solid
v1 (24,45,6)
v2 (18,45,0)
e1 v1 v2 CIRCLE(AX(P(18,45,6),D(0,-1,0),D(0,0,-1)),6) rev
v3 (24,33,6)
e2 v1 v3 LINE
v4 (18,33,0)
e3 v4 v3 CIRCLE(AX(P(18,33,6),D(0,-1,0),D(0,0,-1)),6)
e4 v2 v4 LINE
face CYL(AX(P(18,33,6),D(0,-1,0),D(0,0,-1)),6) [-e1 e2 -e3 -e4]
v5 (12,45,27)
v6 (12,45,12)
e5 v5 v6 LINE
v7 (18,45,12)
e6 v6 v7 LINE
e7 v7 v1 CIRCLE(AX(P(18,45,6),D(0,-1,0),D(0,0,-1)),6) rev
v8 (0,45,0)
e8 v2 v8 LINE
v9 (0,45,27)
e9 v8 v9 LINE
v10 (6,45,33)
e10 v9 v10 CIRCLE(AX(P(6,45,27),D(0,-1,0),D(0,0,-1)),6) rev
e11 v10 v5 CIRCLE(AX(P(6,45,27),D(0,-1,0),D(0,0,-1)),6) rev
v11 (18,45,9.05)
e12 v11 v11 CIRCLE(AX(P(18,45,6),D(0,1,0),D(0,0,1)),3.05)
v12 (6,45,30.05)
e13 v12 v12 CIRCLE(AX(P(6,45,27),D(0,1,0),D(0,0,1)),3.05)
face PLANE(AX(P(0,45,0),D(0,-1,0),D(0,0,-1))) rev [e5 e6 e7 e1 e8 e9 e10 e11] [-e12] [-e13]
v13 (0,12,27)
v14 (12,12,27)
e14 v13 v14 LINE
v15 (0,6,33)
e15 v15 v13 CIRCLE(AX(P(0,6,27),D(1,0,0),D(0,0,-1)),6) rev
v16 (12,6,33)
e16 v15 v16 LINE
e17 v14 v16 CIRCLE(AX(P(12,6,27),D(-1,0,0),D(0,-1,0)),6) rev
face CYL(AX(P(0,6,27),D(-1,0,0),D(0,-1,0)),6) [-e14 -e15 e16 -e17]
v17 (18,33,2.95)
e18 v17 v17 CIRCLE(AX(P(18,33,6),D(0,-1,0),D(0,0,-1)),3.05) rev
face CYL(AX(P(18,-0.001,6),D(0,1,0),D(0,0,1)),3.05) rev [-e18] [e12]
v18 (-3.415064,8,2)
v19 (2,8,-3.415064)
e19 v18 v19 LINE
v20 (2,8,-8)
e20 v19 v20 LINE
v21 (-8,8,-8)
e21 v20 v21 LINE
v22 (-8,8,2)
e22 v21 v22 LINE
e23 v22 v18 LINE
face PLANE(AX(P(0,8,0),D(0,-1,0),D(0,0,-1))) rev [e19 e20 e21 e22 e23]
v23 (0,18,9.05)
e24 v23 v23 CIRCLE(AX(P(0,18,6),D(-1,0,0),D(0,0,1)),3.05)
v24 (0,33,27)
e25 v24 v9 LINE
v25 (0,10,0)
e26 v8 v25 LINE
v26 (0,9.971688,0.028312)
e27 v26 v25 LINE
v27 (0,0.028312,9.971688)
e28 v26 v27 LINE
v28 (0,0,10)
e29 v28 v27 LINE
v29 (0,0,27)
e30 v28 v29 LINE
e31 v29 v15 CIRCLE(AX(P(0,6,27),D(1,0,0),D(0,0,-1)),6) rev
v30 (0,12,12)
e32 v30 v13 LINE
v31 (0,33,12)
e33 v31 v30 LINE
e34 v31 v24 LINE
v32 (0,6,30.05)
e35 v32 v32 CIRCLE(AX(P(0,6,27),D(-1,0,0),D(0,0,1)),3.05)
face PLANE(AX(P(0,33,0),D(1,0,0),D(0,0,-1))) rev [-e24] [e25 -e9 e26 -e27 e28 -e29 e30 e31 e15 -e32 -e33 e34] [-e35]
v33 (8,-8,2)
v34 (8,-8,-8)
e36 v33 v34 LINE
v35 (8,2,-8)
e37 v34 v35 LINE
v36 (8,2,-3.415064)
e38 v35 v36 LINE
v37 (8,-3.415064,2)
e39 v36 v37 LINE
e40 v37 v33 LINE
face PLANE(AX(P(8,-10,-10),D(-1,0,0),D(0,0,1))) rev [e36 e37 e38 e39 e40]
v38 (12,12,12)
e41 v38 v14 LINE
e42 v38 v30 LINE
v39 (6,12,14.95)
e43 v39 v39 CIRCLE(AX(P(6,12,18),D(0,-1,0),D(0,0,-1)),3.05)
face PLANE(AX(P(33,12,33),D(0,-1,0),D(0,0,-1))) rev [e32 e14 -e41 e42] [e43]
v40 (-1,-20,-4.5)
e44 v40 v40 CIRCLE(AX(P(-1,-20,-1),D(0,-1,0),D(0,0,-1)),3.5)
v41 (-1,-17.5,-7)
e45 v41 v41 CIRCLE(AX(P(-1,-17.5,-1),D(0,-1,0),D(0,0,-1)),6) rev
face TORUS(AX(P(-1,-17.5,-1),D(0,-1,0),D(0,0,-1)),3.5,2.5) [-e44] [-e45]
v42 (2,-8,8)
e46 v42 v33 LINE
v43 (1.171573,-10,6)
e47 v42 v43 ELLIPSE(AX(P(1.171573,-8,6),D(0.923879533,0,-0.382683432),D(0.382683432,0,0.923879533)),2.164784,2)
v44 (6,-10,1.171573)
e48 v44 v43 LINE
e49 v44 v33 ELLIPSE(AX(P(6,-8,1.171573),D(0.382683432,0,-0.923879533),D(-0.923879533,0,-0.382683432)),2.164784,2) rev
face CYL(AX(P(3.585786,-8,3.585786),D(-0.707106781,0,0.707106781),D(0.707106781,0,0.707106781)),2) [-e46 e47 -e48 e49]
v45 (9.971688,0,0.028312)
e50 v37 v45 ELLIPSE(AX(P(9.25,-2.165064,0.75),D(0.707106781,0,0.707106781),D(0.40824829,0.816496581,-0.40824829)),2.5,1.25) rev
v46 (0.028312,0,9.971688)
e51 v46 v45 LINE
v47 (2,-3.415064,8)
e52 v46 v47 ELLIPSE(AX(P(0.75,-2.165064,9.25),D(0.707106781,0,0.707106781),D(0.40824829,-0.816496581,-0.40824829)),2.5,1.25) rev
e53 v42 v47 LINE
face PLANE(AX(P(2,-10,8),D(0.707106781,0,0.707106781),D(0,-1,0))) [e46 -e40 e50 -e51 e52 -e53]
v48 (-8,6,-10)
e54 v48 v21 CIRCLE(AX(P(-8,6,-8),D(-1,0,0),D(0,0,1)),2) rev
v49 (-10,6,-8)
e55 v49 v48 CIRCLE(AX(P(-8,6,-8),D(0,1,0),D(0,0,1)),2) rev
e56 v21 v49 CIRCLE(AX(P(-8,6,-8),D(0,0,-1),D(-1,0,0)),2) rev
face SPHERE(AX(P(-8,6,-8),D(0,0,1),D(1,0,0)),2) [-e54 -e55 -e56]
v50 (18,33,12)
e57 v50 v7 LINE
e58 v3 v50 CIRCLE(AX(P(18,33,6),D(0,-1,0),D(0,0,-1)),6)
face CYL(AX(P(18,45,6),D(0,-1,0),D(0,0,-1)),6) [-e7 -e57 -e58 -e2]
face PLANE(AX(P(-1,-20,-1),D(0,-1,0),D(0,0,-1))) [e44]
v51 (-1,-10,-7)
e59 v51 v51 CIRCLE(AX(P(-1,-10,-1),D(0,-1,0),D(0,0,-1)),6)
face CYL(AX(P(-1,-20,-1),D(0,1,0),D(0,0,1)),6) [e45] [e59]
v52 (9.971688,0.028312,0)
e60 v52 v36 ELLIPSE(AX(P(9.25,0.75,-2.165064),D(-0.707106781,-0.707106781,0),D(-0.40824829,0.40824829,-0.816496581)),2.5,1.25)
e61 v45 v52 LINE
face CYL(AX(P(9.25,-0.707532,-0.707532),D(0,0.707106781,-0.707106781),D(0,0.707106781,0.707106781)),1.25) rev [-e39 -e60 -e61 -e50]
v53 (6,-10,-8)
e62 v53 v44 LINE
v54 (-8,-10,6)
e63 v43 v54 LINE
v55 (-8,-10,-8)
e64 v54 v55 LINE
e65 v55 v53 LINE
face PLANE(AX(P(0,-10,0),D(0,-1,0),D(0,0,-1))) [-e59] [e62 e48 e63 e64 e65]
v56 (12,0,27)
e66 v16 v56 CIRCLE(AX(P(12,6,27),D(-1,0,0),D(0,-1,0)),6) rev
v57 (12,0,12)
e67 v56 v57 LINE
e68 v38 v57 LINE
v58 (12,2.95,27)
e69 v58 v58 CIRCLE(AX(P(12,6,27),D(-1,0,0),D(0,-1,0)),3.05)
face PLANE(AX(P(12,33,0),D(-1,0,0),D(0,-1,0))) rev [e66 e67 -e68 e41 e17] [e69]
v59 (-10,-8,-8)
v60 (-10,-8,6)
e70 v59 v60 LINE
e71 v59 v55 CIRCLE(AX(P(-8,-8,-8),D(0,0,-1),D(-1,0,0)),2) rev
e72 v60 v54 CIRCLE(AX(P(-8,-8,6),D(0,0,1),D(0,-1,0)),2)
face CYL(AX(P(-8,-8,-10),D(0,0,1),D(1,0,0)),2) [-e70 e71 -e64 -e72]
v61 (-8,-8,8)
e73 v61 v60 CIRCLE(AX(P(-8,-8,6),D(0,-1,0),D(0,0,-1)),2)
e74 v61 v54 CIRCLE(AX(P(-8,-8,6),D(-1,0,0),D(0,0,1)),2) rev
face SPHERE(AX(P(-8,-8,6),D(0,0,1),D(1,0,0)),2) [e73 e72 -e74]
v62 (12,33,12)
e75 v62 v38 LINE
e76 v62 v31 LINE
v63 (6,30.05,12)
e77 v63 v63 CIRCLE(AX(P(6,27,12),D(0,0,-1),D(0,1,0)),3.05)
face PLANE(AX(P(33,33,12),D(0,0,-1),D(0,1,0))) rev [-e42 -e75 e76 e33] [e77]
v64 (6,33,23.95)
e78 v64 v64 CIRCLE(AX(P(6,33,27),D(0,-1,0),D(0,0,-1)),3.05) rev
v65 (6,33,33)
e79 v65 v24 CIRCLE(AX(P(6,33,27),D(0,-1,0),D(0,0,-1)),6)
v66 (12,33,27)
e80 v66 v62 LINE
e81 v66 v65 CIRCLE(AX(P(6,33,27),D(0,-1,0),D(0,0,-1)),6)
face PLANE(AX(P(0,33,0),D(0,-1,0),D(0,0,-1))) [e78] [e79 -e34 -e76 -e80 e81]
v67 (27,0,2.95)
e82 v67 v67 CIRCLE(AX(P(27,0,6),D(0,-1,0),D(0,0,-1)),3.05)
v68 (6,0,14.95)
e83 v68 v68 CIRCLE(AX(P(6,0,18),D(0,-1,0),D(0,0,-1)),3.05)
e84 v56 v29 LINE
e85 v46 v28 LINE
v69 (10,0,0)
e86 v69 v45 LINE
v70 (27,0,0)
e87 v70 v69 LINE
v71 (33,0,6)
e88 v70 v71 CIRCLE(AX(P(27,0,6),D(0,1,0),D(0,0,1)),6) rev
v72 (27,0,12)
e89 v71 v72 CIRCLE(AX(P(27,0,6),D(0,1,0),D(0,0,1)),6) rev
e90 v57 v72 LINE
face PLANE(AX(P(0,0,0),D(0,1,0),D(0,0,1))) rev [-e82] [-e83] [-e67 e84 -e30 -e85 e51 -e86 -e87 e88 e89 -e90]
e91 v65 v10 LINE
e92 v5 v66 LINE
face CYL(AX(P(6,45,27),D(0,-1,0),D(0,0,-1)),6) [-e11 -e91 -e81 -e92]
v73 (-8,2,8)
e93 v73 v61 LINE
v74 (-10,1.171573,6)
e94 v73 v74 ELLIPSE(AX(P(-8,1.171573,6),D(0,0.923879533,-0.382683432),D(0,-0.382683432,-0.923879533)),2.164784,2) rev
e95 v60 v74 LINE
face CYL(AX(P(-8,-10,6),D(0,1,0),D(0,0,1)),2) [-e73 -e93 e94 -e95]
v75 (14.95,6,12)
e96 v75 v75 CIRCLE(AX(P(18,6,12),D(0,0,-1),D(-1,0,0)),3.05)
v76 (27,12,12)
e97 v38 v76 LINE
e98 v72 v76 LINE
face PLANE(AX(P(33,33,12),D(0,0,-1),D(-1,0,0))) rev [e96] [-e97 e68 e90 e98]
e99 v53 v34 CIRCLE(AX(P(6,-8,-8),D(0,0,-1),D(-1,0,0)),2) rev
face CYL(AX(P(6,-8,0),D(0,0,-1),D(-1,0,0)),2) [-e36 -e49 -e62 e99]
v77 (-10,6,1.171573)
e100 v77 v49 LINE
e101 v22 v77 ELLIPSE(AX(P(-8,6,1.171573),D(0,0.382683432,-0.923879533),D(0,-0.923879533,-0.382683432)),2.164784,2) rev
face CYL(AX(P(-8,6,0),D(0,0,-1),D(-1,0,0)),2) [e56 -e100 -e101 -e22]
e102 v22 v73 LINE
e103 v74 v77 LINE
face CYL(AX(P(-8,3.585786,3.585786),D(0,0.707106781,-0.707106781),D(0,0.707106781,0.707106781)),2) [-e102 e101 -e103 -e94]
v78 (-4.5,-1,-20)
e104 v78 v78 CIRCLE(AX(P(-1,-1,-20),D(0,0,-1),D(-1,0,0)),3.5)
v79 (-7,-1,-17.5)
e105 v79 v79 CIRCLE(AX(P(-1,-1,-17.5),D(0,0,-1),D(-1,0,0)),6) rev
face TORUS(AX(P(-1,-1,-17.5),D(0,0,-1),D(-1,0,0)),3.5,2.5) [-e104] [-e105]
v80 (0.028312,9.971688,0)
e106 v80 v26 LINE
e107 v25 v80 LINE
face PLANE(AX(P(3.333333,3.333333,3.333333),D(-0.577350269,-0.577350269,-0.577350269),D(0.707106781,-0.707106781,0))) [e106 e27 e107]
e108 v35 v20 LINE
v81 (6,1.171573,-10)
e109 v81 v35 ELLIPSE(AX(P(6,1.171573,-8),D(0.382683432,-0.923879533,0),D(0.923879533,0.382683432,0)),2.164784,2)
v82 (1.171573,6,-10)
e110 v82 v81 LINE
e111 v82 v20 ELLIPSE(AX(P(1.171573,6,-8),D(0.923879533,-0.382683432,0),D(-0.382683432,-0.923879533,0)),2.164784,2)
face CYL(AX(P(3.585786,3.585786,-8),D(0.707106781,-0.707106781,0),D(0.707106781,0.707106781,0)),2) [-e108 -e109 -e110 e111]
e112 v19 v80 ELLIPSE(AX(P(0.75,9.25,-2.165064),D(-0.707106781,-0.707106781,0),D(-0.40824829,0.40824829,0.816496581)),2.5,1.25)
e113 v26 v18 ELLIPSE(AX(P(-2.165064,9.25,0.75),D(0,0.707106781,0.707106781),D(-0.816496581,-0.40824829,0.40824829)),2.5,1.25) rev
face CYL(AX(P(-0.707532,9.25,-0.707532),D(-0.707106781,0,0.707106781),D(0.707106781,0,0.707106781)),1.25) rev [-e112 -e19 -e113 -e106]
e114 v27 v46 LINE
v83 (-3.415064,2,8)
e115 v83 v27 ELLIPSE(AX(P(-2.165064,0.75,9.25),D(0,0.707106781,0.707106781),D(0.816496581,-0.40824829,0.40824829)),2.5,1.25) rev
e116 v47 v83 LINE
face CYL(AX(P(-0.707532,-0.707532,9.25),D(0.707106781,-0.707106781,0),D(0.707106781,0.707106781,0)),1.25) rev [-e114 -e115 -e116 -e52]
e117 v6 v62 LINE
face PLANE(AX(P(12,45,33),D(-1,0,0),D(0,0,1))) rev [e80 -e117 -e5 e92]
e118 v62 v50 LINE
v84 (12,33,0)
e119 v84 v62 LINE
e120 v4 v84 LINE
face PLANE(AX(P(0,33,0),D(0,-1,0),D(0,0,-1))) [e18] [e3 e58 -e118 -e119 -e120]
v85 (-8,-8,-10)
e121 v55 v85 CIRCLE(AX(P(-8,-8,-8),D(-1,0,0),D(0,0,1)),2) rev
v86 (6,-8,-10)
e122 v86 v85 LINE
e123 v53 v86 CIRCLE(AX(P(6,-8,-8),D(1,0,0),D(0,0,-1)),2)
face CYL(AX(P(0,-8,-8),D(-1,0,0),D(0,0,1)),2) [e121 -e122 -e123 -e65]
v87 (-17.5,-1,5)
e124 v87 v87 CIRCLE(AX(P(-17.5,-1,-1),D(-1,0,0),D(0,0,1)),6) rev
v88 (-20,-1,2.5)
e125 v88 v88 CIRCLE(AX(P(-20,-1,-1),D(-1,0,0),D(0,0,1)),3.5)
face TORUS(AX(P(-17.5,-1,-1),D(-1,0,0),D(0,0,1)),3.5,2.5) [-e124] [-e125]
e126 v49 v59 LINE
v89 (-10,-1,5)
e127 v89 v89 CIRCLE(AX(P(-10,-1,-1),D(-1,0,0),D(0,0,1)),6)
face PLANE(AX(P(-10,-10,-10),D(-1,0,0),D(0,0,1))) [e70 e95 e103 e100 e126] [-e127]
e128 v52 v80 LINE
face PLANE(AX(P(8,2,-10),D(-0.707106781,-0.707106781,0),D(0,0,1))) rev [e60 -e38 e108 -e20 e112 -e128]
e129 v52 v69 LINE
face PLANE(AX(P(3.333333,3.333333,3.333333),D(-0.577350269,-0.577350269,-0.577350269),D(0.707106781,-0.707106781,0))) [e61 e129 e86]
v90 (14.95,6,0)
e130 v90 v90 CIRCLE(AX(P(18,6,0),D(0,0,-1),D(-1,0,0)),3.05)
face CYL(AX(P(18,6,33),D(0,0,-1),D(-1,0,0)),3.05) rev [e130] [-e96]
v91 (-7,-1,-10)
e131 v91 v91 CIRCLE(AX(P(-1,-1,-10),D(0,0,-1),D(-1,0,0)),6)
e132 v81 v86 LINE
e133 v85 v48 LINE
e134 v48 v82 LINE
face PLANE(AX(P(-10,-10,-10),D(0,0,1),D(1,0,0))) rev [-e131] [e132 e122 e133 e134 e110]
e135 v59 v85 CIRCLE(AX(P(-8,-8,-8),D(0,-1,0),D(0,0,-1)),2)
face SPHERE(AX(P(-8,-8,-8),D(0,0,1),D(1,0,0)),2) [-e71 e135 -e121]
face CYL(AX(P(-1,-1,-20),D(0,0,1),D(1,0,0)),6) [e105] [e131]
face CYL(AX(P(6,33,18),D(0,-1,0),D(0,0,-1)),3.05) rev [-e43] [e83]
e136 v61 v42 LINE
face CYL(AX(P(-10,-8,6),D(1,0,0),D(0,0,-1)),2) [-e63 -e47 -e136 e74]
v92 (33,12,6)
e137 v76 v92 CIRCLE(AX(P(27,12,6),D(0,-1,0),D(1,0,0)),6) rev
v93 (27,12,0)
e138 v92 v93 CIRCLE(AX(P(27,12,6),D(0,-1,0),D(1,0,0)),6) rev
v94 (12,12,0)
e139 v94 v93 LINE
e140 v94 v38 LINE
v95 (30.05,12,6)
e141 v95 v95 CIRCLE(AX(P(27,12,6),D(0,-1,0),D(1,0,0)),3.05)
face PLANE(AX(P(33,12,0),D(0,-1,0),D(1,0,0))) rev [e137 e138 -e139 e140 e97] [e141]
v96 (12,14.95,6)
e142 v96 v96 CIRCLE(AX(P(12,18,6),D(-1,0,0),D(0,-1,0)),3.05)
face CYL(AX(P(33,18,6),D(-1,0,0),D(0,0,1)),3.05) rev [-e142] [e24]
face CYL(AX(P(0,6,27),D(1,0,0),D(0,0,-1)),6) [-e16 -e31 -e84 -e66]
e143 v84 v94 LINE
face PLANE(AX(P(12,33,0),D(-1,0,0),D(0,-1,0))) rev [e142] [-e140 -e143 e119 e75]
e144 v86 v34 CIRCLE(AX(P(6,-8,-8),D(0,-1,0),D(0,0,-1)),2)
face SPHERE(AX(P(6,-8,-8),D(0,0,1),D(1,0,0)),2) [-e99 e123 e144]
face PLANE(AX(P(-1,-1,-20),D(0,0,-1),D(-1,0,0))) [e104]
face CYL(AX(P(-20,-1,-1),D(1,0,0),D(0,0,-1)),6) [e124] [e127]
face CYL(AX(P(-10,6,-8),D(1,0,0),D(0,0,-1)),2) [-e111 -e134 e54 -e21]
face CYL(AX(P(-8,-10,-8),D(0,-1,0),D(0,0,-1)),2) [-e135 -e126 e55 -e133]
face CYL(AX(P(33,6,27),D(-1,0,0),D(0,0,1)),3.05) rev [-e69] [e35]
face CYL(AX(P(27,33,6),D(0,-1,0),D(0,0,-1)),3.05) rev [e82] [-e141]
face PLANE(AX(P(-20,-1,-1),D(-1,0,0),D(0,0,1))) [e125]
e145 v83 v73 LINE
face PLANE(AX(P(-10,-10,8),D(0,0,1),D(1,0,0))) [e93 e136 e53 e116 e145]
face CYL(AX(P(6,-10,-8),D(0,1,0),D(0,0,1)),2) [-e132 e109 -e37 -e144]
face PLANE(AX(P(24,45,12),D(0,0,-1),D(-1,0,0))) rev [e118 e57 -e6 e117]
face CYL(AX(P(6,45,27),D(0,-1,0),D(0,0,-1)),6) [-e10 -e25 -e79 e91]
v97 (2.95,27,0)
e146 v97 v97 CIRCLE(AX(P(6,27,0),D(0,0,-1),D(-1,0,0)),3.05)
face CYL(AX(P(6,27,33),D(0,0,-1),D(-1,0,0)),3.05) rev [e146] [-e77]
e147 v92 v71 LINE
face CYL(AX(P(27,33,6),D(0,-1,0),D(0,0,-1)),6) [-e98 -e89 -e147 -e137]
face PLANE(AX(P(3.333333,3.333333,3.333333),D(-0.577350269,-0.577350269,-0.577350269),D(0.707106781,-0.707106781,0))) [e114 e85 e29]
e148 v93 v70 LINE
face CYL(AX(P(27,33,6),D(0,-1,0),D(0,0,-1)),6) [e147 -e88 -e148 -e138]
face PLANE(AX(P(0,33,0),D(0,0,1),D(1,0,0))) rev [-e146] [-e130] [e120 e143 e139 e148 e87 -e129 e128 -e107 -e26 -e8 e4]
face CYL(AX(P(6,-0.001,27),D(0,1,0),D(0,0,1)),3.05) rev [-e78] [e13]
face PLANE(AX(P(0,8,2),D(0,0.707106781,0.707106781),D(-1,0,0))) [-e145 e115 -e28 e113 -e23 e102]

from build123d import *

# Parameters (mm, degrees)
SKETCH1_W                = 33
SKETCH1_H                = 33
BOSS_EXTRUDE1_DEPTH      = 33
SKETCH2_W                = 21
SKETCH2_H                = 21
CUT_EXTRUDE1_DEPTH       = 58.15767665
SKETCH3_W                = 21
SKETCH3_H                = 21
CUT_EXTRUDE2_DEPTH       = 58.15767665
SKETCH4_W                = 21
SKETCH4_H                = 21
CUT_EXTRUDE3_DEPTH       = 58.15767665
SKETCH5_R                = 3.05
CUT_EXTRUDE4_DEPTH       = 58.15767665
SKETCH6_R                = 3.05
CUT_EXTRUDE5_DEPTH       = 58.15767665
SKETCH7_R                = 3.05
CUT_EXTRUDE6_DEPTH       = 58.15767665
BOSS_EXTRUDE7_DEPTH      = 12
CUT_EXTRUDE7_REACH       = 66.831
SKETCH14_R               = 3.05
FILLET1_R                = 6
CHAMFER1_START           = -1
CHAMFER1_OUTLINE_W       = 16
CHAMFER1_OUTLINE_H       = 18
CHAMFER1_DEPTH           = 6.773502692
BOSS_EXTRUDE3_DEPTH      = 8
BOSS_EXTRUDE3_DEPTH_BACK = 10
SKETCH9_W                = 18
SKETCH9_H                = 18
CHAMFER2_SIZE            = 6
FILLET2_R                = 1.25
SKETCH10_R               = 6
BOSS_EXTRUDE4_DEPTH      = 10
SKETCH11_R               = 6
BOSS_EXTRUDE5_DEPTH      = 10
SKETCH12_R               = 6
BOSS_EXTRUDE6_DEPTH      = 10
FILLET3_R                = 2
FILLET4_R                = 2.5


with BuildPart() as part:
    # Sketch1 → Boss-Extrude1 (new body)
    with BuildSketch(Plane(origin=(0, 0, 0), x_dir=(1, 0, 0), z_dir=(0, 1, 0))):
        with Locations((16.5, -16.5)):
            Rectangle(SKETCH1_W, SKETCH1_H)
    extrude(amount=BOSS_EXTRUDE1_DEPTH)

    # Sketch2 → Cut-Extrude1 (cut, through all)
    with BuildSketch(Plane.XY.offset(33)):
        with Locations((22.5, 22.5)):
            Rectangle(SKETCH2_W, SKETCH2_H)
    extrude(amount=-CUT_EXTRUDE1_DEPTH, mode=Mode.SUBTRACT)

    # Sketch3 → Cut-Extrude2 (cut, through all)
    with BuildSketch(Plane.XZ):
        with Locations((22.5, 22.5)):
            Rectangle(SKETCH3_W, SKETCH3_H)
    extrude(amount=-CUT_EXTRUDE2_DEPTH, mode=Mode.SUBTRACT)

    # Sketch4 → Cut-Extrude3 (cut, through all)
    with BuildSketch(Plane.ZY):
        with Locations((22.5, 22.5)):
            Rectangle(SKETCH4_W, SKETCH4_H)
    extrude(amount=-CUT_EXTRUDE3_DEPTH, mode=Mode.SUBTRACT)

    # Sketch5 → Cut-Extrude4 (cut, through all)
    with BuildSketch(Plane.ZY):
        with Locations((27, 6)):
            Circle(SKETCH5_R)
        with Locations((6, 18)):
            Circle(SKETCH5_R)
    extrude(amount=-CUT_EXTRUDE4_DEPTH, mode=Mode.SUBTRACT)

    # Sketch6 → Cut-Extrude5 (cut, through all)
    with BuildSketch(Plane.XZ):
        with Locations(Location((6, 18, 0), (0, 0, 270))):
            Circle(SKETCH6_R)
        with Locations(Location((27, 6, 0), (0, 0, 270))):
            Circle(SKETCH6_R)
    extrude(amount=-CUT_EXTRUDE5_DEPTH, mode=Mode.SUBTRACT)

    # Sketch7 → Cut-Extrude6 (cut, through all)
    with BuildSketch(Plane(origin=(0, 0, 0), x_dir=(-1, 0, 0), z_dir=(0, 0, -1))):
        with Locations((-18, 6)):
            Circle(SKETCH7_R)
        with Locations((-6, 27)):
            Circle(SKETCH7_R)
    extrude(amount=-CUT_EXTRUDE6_DEPTH, mode=Mode.SUBTRACT)

    # Sketch13 → Boss-Extrude7 (add)
    with BuildSketch(Plane(origin=(0, 33, 0), x_dir=(1, 0, 0), z_dir=(0, 1, 0))):
        Polygon((24, 0), (24, -12), (12, -12), (12, -33), (0, -33), (0, 0), align=None)
    extrude(amount=BOSS_EXTRUDE7_DEPTH)

    # Sketch14 → Cut-Extrude7 (cut, up to next)
    with BuildSketch(Plane(origin=(0, 45, 0), x_dir=(1, 0, 0), z_dir=(0, 1, 0)), mode=Mode.PRIVATE) as cut_extrude7_sk1:
        with Locations(Location((18, -6, 0), (0, 0, 270))):
            Circle(SKETCH14_R)
    cut_extrude7_tool1 = extrude(cut_extrude7_sk1.sketch, amount=-CUT_EXTRUDE7_REACH, mode=Mode.PRIVATE) & part.part
    # Sketch14 → Cut-Extrude7 (cut, up to next)
    with BuildSketch(Plane(origin=(0, 45, 0), x_dir=(1, 0, 0), z_dir=(0, 1, 0)), mode=Mode.PRIVATE) as cut_extrude7_sk2:
        with Locations(Location((6, -27, 0), (0, 0, 270))):
            Circle(SKETCH14_R)
    cut_extrude7_tool2 = extrude(cut_extrude7_sk2.sketch, amount=-CUT_EXTRUDE7_REACH, mode=Mode.PRIVATE) & part.part
    add(cut_extrude7_tool1.solids().sort_by_distance((18, 45, 6))[0], mode=Mode.SUBTRACT)
    add(cut_extrude7_tool2.solids().sort_by_distance((6, 45, 27))[0], mode=Mode.SUBTRACT)

    # Fillet1
    fillet1_edges = [part.edges().sort_by_distance(p)[0] for p in [
        (6, 12, 33),
        (6, 0, 33),
        (33, 6, 0),
        (33, 6, 12),
        (24, 39, 0),
        (24, 39, 12),
        (0, 39, 33),
        (12, 39, 33),
    ]]
    fillet(fillet1_edges, radius=FILLET1_R - 0.0001)  # a hair under: the kernel refuses the full size

    # Chamfer1: read off the stored shape, not the designer's step
    # Chamfer1 outline → Chamfer1 (cut)
    with BuildSketch(Plane(origin=(0, 0, 0), x_dir=(0.8164965809277258, -0.40824829046386313, -0.40824829046386313), z_dir=(0.5773502691896258, 0.5773502691896258, 0.5773502691896258)).offset(CHAMFER1_START)):
        with Locations((2, 0)):
            Rectangle(CHAMFER1_OUTLINE_W, CHAMFER1_OUTLINE_H)
    extrude(amount=CHAMFER1_DEPTH, mode=Mode.SUBTRACT)

    # Sketch9 → Boss-Extrude3 (add, two sides: drawn at the far end of the back side and taken through both)
    with BuildSketch(Plane(origin=(0, 0, 0), x_dir=(1, 0, 0), z_dir=(0, 1, 0)).offset(-BOSS_EXTRUDE3_DEPTH_BACK)):
        with Locations((-1, 1)):
            Rectangle(SKETCH9_W, SKETCH9_H)
    extrude(amount=BOSS_EXTRUDE3_DEPTH + BOSS_EXTRUDE3_DEPTH_BACK)

    # Chamfer2
    chamfer2_edges = [part.edges().sort_by_distance(p)[0] for p in [
        (8, -5, 8),
        (8, 8, -5),
        (-5, 8, 8),
    ]]
    chamfer(chamfer2_edges, length=CHAMFER2_SIZE)

    # Fillet2
    # the kernel refuses this fillet: 1.25 mm, written as the material it adds along each edge
    with BuildSketch(Plane(origin=(-4.268829387, 8, 6.268829387), x_dir=(-0.408248290463863, 0.816496580927726, -0.408248290463863), z_dir=(0.7071067811865476, 0, -0.7071067811865476))) as fillet2_piece_1_section:
        with BuildLine():
            CenterArc((FILLET2_R * 1.93185165258, -FILLET2_R), FILLET2_R, 90, 125.264389683)
            Line((FILLET2_R * 1.11535507165, -FILLET2_R * 1.57735026919), (0, 0))
            Line((0, 0), (FILLET2_R * 1.93185165258, 0))
        make_face()
    fillet2_piece_1 = extrude(amount=14.902499954, mode=Mode.PRIVATE)
    fillet2_piece_1 = split(fillet2_piece_1, bisect_by=Plane(origin=(-1.134414693, 11.134414693, 6.268829387), z_dir=(-0.7071067811865476, -0.7071067811865476, 0)), keep=Keep.TOP, mode=Mode.PRIVATE)
    fillet2_piece_1 = split(fillet2_piece_1, bisect_by=Plane(origin=(-4.268829387, 5.865585306, 4.134414694), z_dir=(0, -0.7071067811865476, -0.7071067811865476)), keep=Keep.TOP, mode=Mode.PRIVATE)
    add(fillet2_piece_1)
    with BuildSketch(Plane(origin=(-4.268829387, 6.268829387, 8), x_dir=(-0.4082482904638628, -0.4082482904638628, 0.8164965809277263), z_dir=(0.7071067811865476, -0.7071067811865476, 0))) as fillet2_piece_2_section:
        with BuildLine():
            CenterArc((FILLET2_R * 1.93185165258, FILLET2_R), FILLET2_R, 144.735610317, 125.264389683)
            Line((FILLET2_R * 1.11535507165, FILLET2_R * 1.57735026919), (0, 0))
            Line((0, 0), (FILLET2_R * 1.93185165258, 0))
        make_face()
    fillet2_piece_2 = extrude(amount=14.902499954, mode=Mode.PRIVATE)
    fillet2_piece_2 = split(fillet2_piece_2, bisect_by=Plane(origin=(-4.268829387, 4.134414694, 5.865585306), z_dir=(0, -0.7071067811865476, -0.7071067811865476)), keep=Keep.TOP, mode=Mode.PRIVATE)
    fillet2_piece_2 = split(fillet2_piece_2, bisect_by=Plane(origin=(-1.134414693, 6.268829387, 11.134414693), z_dir=(-0.7071067811865476, 0, -0.7071067811865475)), keep=Keep.TOP, mode=Mode.PRIVATE)
    add(fillet2_piece_2)
    with BuildSketch(Plane(origin=(8, -4.268829387, 6.268829387), x_dir=(0.8164965809277257, -0.40824829046386313, -0.4082482904638633), z_dir=(0, 0.7071067811865476, -0.7071067811865475))) as fillet2_piece_3_section:
        with BuildLine():
            CenterArc((FILLET2_R * 1.93185165258, FILLET2_R), FILLET2_R, 144.735610317, 125.264389683)
            Line((FILLET2_R * 1.11535507165, FILLET2_R * 1.57735026919), (0, 0))
            Line((0, 0), (FILLET2_R * 1.93185165258, 0))
        make_face()
    fillet2_piece_3 = extrude(amount=14.902499954, mode=Mode.PRIVATE)
    fillet2_piece_3 = split(fillet2_piece_3, bisect_by=Plane(origin=(11.134414693, -1.134414693, 6.268829387), z_dir=(-0.7071067811865476, -0.7071067811865476, 0)), keep=Keep.TOP, mode=Mode.PRIVATE)
    fillet2_piece_3 = split(fillet2_piece_3, bisect_by=Plane(origin=(5.865585306, -4.268829387, 4.134414694), z_dir=(-0.7071067811865476, 0, -0.7071067811865475)), keep=Keep.TOP, mode=Mode.PRIVATE)
    add(fillet2_piece_3)

    # Sketch10 → Boss-Extrude4 (add)
    with BuildSketch(Plane.XZ.offset(10)):
        with Locations(Location((-1, -1, 0), (0, 0, 270))):
            Circle(SKETCH10_R)
    extrude(amount=BOSS_EXTRUDE4_DEPTH)

    # Sketch11 → Boss-Extrude5 (add)
    with BuildSketch(Plane.ZY.offset(10)):
        with Locations((-1, -1)):
            Circle(SKETCH11_R)
    extrude(amount=BOSS_EXTRUDE5_DEPTH)

    # Sketch12 → Boss-Extrude6 (add)
    with BuildSketch(Plane(origin=(0, 0, -10), x_dir=(-1, 0, 0), z_dir=(0, 0, -1))):
        with Locations((1, -1)):
            Circle(SKETCH12_R)
    extrude(amount=BOSS_EXTRUDE6_DEPTH)

    # Fillet3
    fillet3_edges = [part.edges().sort_by_distance(p)[0] for p in [
        (8, -4, -10),
        (-4, -10, 8),
        (-10, 8, -4),
        (-10, -1, -10),
        (-4, 8, -10),
        (-10, -4, 8),
        (-10, -10, -1),
        (-1, -10, -10),
        (8, -10, -4),
        (5, -10, 5),
        (5, 5, -10),
        (-10, 5, 5),
    ]]
    fillet(fillet3_edges, radius=FILLET3_R)

    # Fillet4
    fillet4_edges = [part.edges().sort_by_distance(p)[0] for p in [
        (-1, -20, 5),
        (-20, -1, -7),
        (5, -1, -20),
    ]]
    fillet(fillet4_edges, radius=FILLET4_R)


solid = part.part
